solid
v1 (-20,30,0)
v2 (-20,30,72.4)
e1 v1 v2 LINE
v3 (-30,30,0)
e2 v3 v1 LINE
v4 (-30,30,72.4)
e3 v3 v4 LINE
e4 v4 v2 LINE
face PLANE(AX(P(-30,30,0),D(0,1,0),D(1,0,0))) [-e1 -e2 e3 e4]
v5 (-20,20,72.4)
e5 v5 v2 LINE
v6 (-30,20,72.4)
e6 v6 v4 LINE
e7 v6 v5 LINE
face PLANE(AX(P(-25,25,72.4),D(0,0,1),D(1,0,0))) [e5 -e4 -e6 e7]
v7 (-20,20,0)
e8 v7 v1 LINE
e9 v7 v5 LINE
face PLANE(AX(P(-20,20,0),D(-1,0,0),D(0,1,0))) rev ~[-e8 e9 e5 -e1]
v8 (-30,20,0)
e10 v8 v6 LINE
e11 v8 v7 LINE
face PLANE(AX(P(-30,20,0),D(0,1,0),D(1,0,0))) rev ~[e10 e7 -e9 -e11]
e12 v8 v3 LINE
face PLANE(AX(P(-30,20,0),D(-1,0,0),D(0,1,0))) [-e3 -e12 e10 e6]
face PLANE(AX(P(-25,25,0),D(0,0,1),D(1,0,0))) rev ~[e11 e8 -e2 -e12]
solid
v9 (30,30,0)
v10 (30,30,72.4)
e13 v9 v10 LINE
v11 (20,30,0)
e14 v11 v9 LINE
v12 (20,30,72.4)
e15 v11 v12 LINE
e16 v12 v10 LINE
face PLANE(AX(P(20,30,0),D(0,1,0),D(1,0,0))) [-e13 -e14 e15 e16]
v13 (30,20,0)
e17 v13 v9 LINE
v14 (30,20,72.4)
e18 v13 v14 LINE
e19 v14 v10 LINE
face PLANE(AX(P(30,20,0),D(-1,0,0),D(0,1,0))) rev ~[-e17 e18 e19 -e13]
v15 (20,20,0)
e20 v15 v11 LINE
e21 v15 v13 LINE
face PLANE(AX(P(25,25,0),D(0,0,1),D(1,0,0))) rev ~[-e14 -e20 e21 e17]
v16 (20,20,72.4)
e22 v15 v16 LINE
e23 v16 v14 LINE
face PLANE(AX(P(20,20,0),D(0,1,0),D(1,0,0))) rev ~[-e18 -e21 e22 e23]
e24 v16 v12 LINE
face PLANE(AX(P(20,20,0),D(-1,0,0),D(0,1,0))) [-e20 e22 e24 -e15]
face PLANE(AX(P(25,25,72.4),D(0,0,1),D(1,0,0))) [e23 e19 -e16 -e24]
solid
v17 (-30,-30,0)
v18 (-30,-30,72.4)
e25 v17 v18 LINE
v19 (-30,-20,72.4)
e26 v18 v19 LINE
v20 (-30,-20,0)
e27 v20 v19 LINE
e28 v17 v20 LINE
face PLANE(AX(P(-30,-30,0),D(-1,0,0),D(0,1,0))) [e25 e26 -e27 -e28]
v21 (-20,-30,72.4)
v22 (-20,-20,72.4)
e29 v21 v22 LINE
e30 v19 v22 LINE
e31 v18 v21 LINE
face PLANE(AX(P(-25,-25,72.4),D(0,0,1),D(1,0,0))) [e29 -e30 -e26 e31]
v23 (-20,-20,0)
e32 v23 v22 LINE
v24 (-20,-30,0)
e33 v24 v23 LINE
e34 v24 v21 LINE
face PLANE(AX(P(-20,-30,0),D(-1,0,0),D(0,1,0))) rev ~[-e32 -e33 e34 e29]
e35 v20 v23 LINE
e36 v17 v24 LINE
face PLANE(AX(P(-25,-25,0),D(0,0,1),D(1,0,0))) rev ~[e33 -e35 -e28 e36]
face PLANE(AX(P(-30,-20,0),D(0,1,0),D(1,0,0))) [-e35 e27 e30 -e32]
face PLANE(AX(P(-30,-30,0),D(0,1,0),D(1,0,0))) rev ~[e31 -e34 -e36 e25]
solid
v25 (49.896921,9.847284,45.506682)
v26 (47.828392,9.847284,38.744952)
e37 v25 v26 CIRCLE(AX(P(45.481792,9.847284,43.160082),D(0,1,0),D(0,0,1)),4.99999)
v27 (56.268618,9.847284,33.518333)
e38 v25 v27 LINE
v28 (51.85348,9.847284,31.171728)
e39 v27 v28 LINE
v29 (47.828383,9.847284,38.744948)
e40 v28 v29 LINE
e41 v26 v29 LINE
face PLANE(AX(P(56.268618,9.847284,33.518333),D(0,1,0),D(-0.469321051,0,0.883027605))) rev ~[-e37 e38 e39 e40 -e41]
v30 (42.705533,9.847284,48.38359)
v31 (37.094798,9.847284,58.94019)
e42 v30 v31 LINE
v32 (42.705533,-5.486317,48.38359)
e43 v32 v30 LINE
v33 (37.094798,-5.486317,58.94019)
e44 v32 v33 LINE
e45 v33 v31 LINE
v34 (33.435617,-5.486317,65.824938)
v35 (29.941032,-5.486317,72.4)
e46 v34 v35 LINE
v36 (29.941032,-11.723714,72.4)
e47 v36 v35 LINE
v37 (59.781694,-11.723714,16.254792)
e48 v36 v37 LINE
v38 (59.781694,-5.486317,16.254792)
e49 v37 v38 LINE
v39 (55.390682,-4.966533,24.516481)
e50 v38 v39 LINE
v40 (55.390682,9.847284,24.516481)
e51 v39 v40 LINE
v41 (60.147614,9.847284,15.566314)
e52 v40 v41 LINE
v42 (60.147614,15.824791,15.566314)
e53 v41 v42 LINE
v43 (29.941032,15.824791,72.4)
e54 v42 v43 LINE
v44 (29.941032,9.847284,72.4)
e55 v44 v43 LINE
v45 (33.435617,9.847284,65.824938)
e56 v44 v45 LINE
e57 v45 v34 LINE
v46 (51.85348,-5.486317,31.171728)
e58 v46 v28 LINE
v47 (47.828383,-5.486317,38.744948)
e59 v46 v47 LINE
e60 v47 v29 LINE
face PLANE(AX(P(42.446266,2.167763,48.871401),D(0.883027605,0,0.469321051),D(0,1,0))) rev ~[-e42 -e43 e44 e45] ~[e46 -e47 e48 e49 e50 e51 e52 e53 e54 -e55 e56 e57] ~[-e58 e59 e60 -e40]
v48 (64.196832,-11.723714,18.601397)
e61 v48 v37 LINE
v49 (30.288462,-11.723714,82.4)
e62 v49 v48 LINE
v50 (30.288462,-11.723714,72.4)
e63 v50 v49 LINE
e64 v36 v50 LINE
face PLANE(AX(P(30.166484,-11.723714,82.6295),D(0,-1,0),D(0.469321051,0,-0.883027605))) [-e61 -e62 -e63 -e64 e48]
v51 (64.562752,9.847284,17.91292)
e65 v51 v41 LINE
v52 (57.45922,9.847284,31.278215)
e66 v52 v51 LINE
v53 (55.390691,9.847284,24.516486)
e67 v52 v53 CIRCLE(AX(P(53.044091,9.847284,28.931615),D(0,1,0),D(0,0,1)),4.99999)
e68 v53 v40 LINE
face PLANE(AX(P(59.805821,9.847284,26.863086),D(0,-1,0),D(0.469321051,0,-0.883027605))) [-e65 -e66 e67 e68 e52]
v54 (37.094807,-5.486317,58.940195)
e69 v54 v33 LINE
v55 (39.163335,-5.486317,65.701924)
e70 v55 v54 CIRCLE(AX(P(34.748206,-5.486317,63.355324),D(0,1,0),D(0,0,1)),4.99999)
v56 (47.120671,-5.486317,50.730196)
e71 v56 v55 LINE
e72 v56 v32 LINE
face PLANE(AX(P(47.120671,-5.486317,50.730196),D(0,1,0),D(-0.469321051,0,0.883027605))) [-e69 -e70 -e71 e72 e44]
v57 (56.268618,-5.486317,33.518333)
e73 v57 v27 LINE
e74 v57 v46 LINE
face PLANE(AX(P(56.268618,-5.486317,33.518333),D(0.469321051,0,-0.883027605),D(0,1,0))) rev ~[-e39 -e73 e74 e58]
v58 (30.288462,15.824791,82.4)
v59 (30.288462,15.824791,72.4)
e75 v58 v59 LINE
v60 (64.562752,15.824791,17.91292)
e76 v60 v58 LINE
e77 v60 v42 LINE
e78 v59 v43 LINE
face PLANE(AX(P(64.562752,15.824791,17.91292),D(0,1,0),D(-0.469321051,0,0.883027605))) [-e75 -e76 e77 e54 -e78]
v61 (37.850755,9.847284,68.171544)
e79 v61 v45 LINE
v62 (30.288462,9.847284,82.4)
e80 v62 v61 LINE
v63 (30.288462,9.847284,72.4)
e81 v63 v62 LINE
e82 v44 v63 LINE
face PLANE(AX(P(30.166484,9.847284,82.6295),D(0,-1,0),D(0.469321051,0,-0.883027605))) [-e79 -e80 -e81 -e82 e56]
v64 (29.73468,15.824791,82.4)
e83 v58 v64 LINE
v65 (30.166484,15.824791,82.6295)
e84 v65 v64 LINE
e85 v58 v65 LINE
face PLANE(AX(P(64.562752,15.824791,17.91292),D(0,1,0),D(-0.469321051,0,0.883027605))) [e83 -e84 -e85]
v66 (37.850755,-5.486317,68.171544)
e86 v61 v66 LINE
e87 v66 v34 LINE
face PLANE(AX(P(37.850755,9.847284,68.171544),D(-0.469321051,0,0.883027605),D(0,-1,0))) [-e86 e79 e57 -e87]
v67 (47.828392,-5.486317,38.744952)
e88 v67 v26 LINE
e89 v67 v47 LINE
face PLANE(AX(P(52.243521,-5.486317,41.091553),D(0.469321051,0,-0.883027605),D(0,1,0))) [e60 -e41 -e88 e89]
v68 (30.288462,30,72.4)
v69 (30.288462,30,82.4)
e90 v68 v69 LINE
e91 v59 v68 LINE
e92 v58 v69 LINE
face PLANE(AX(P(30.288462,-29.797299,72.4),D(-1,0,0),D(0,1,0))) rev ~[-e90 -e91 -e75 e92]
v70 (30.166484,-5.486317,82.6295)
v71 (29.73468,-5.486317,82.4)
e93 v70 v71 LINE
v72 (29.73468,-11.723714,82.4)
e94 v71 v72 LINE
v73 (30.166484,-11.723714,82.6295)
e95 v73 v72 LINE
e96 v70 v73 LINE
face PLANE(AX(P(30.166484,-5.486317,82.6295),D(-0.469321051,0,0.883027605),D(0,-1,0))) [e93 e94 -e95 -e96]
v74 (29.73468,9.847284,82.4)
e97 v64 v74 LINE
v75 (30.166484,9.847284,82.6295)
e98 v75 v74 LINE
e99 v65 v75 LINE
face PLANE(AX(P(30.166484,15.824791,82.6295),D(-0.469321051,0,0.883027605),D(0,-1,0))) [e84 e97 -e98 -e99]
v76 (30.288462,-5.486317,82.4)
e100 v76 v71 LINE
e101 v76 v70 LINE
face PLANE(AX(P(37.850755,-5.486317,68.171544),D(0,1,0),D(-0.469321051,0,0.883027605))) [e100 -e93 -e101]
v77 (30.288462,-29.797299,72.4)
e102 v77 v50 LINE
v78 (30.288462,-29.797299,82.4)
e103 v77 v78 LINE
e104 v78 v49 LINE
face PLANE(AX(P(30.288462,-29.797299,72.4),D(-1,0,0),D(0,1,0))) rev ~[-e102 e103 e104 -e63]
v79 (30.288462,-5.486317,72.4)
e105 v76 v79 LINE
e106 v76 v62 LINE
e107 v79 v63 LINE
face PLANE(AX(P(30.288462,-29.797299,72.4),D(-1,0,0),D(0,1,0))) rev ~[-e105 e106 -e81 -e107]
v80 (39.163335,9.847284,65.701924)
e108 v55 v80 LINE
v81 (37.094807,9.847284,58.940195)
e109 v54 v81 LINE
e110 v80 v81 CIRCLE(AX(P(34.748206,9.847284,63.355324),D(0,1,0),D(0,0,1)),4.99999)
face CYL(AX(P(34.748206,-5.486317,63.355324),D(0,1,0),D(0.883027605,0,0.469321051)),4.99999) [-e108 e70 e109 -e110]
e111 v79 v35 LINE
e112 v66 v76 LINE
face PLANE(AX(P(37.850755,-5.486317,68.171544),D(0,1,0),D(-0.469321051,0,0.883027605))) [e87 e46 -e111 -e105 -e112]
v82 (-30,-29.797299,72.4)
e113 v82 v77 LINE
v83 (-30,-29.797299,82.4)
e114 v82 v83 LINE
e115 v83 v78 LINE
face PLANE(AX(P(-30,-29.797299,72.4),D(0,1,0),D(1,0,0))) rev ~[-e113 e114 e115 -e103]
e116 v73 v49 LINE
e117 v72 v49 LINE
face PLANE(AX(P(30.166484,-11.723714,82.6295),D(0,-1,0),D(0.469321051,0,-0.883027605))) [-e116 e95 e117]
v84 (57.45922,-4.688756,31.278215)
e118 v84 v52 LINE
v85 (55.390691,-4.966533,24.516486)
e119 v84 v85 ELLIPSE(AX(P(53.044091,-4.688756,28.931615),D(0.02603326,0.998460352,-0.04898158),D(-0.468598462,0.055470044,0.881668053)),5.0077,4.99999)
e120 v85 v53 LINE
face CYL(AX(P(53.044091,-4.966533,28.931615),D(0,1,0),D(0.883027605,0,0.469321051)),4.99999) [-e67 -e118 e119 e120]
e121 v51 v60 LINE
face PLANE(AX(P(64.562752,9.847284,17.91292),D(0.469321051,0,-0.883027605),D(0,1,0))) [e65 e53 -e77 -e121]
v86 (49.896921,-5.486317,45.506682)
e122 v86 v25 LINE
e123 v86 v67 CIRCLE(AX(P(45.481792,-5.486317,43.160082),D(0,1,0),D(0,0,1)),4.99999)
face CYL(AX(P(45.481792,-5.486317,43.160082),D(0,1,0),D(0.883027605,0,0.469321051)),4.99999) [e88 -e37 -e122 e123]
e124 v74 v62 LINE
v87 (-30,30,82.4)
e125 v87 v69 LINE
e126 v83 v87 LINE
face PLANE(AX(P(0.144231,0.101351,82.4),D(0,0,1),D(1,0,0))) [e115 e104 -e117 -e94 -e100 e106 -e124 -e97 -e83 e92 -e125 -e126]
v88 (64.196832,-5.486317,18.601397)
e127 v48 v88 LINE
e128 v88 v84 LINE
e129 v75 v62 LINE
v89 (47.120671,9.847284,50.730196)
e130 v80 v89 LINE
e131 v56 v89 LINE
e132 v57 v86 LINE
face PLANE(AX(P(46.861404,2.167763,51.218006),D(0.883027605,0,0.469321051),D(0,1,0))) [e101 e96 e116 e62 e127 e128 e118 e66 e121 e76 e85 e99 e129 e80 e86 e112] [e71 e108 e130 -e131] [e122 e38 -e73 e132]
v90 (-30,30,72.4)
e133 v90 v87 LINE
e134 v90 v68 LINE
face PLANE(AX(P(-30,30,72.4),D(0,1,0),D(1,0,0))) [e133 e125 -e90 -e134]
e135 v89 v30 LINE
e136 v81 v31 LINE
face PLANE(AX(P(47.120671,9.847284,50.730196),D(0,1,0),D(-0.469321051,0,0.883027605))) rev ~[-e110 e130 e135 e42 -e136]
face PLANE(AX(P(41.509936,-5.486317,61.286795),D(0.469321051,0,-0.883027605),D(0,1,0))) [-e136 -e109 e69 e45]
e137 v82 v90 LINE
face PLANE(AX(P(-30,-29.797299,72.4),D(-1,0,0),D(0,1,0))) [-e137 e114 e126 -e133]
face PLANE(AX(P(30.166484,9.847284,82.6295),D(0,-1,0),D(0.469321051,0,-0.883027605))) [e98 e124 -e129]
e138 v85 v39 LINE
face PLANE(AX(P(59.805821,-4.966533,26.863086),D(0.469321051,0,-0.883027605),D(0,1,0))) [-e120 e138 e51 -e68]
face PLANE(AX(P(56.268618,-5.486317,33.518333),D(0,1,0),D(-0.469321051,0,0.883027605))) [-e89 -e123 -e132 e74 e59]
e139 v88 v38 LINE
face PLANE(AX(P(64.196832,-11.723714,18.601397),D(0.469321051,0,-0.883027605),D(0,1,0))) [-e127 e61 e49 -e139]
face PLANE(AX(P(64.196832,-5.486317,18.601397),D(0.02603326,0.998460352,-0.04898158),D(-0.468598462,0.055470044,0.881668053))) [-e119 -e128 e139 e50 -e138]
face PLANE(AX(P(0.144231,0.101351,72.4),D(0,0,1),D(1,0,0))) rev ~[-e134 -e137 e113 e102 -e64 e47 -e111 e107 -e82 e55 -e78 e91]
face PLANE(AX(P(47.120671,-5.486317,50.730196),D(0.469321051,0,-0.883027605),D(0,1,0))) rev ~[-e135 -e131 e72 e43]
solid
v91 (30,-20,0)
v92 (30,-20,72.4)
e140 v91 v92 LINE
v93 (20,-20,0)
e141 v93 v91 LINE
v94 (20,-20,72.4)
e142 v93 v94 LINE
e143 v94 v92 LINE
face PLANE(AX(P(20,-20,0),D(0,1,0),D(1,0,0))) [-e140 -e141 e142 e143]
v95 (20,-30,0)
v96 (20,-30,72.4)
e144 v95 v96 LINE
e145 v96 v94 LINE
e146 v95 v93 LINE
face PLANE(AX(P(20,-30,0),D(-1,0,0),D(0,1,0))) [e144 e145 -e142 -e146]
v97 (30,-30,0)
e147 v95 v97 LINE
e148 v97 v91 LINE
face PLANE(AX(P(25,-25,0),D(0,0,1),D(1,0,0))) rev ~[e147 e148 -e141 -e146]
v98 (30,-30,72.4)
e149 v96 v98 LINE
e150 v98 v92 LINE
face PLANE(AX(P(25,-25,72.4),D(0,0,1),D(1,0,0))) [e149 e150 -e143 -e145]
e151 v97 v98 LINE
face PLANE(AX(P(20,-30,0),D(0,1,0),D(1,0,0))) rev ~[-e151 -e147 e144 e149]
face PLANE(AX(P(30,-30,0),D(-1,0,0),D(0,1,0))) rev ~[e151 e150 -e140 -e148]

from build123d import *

# Parameters (mm, degrees)
F0_W     = 10
F0_H     = 10
F1_DEPTH = 72.4
F2_W     = 60.2884615958
F2_H     = 59.7972988337
F3_DEPTH = 10
F5_W     = 15.3336008079
F5_H     = 8.5764247924
F5_H_2   = 11.9550051168
F6_DEPTH = 5
F7_R     = 4.99999


# Not quite as in the source:
# - a fillet or chamfer is up to 0.001 mm smaller than in the source, because OpenCascade refuses the exact size


with BuildPart() as f1:
    # F0 (on Top) → F1 (new body)
    with BuildSketch(Plane.XY):
        with Locations((25, 25)):
            Rectangle(F0_W, F0_H)
    extrude(amount=F1_DEPTH)


with BuildPart() as f1b:
    # F0 (on Top) → F1, piece 2 (new body)
    with BuildSketch(Plane.XY):
        with Locations((-25, 25)):
            Rectangle(F0_W, F0_H)
    extrude(amount=F1_DEPTH)


with BuildPart() as f1c:
    # F0 (on Top) → F1, piece 3 (new body)
    with BuildSketch(Plane.XY):
        with Locations((25, -25)):
            Rectangle(F0_W, F0_H)
    extrude(amount=F1_DEPTH)


with BuildPart() as f1d:
    # F0 (on Top) → F1, piece 4 (new body)
    with BuildSketch(Plane.XY):
        with Locations((-25, -25)):
            Rectangle(F0_W, F0_H)
    extrude(amount=F1_DEPTH)


with BuildPart() as f3:
    # F2 (on face) → F3 (new body)
    with BuildSketch(Plane.XY.offset(72.4)):
        with Locations((0.1442307979, 0.1013505831)):
            Rectangle(F2_W, F2_H)
    extrude(amount=F3_DEPTH)

    # F5 (on face) → F6 (join)
    with BuildSketch(Plane(origin=(57.7655486917, 0, 30.7018579048), x_dir=(0, 1, 0), z_dir=(0.8830276047, 0, 0.4693210514))):
        Polygon((-5.4863165133, 58.8063634932), (-11.7237139493, 58.8063634932), (-11.7237139493, -13.7033779174), (-5.4863165133, -13.7033779174), (-4.9665332772, -4.3472838588), (9.8472842947, -4.3472838588), (9.8472842947, -14.4830560312), (15.824791044, -14.4830560312), (15.824791044, 58.8063634932), (9.8472842947, 58.8063634932), (9.8472842947, 42.4331985414), (-5.4863165133, 42.4331985414), align=None)
        with Locations((2.1804838907, 7.4777789414)):
            Rectangle(F5_W, F5_H, mode=Mode.SUBTRACT)
        with Locations((2.1804838907, 28.6589427851)):
            Rectangle(F5_W, F5_H_2, mode=Mode.SUBTRACT)
    extrude(amount=-F6_DEPTH)

    # F7 (radius 5 in the source; OpenCascade refuses exactly that, so slightly less here)
    f7_edges = [f3.edges().sort_by_distance(p)[0] for p in [
        (41.509936, 2.180484, 61.286795),
        (52.243521, 2.180484, 41.091553),
        (59.805821, 2.440376, 26.863086),
    ]]
    fillet(f7_edges, radius=F7_R)


solid = Compound([f1.part, f1b.part, f1c.part, f1d.part, f3.part])
